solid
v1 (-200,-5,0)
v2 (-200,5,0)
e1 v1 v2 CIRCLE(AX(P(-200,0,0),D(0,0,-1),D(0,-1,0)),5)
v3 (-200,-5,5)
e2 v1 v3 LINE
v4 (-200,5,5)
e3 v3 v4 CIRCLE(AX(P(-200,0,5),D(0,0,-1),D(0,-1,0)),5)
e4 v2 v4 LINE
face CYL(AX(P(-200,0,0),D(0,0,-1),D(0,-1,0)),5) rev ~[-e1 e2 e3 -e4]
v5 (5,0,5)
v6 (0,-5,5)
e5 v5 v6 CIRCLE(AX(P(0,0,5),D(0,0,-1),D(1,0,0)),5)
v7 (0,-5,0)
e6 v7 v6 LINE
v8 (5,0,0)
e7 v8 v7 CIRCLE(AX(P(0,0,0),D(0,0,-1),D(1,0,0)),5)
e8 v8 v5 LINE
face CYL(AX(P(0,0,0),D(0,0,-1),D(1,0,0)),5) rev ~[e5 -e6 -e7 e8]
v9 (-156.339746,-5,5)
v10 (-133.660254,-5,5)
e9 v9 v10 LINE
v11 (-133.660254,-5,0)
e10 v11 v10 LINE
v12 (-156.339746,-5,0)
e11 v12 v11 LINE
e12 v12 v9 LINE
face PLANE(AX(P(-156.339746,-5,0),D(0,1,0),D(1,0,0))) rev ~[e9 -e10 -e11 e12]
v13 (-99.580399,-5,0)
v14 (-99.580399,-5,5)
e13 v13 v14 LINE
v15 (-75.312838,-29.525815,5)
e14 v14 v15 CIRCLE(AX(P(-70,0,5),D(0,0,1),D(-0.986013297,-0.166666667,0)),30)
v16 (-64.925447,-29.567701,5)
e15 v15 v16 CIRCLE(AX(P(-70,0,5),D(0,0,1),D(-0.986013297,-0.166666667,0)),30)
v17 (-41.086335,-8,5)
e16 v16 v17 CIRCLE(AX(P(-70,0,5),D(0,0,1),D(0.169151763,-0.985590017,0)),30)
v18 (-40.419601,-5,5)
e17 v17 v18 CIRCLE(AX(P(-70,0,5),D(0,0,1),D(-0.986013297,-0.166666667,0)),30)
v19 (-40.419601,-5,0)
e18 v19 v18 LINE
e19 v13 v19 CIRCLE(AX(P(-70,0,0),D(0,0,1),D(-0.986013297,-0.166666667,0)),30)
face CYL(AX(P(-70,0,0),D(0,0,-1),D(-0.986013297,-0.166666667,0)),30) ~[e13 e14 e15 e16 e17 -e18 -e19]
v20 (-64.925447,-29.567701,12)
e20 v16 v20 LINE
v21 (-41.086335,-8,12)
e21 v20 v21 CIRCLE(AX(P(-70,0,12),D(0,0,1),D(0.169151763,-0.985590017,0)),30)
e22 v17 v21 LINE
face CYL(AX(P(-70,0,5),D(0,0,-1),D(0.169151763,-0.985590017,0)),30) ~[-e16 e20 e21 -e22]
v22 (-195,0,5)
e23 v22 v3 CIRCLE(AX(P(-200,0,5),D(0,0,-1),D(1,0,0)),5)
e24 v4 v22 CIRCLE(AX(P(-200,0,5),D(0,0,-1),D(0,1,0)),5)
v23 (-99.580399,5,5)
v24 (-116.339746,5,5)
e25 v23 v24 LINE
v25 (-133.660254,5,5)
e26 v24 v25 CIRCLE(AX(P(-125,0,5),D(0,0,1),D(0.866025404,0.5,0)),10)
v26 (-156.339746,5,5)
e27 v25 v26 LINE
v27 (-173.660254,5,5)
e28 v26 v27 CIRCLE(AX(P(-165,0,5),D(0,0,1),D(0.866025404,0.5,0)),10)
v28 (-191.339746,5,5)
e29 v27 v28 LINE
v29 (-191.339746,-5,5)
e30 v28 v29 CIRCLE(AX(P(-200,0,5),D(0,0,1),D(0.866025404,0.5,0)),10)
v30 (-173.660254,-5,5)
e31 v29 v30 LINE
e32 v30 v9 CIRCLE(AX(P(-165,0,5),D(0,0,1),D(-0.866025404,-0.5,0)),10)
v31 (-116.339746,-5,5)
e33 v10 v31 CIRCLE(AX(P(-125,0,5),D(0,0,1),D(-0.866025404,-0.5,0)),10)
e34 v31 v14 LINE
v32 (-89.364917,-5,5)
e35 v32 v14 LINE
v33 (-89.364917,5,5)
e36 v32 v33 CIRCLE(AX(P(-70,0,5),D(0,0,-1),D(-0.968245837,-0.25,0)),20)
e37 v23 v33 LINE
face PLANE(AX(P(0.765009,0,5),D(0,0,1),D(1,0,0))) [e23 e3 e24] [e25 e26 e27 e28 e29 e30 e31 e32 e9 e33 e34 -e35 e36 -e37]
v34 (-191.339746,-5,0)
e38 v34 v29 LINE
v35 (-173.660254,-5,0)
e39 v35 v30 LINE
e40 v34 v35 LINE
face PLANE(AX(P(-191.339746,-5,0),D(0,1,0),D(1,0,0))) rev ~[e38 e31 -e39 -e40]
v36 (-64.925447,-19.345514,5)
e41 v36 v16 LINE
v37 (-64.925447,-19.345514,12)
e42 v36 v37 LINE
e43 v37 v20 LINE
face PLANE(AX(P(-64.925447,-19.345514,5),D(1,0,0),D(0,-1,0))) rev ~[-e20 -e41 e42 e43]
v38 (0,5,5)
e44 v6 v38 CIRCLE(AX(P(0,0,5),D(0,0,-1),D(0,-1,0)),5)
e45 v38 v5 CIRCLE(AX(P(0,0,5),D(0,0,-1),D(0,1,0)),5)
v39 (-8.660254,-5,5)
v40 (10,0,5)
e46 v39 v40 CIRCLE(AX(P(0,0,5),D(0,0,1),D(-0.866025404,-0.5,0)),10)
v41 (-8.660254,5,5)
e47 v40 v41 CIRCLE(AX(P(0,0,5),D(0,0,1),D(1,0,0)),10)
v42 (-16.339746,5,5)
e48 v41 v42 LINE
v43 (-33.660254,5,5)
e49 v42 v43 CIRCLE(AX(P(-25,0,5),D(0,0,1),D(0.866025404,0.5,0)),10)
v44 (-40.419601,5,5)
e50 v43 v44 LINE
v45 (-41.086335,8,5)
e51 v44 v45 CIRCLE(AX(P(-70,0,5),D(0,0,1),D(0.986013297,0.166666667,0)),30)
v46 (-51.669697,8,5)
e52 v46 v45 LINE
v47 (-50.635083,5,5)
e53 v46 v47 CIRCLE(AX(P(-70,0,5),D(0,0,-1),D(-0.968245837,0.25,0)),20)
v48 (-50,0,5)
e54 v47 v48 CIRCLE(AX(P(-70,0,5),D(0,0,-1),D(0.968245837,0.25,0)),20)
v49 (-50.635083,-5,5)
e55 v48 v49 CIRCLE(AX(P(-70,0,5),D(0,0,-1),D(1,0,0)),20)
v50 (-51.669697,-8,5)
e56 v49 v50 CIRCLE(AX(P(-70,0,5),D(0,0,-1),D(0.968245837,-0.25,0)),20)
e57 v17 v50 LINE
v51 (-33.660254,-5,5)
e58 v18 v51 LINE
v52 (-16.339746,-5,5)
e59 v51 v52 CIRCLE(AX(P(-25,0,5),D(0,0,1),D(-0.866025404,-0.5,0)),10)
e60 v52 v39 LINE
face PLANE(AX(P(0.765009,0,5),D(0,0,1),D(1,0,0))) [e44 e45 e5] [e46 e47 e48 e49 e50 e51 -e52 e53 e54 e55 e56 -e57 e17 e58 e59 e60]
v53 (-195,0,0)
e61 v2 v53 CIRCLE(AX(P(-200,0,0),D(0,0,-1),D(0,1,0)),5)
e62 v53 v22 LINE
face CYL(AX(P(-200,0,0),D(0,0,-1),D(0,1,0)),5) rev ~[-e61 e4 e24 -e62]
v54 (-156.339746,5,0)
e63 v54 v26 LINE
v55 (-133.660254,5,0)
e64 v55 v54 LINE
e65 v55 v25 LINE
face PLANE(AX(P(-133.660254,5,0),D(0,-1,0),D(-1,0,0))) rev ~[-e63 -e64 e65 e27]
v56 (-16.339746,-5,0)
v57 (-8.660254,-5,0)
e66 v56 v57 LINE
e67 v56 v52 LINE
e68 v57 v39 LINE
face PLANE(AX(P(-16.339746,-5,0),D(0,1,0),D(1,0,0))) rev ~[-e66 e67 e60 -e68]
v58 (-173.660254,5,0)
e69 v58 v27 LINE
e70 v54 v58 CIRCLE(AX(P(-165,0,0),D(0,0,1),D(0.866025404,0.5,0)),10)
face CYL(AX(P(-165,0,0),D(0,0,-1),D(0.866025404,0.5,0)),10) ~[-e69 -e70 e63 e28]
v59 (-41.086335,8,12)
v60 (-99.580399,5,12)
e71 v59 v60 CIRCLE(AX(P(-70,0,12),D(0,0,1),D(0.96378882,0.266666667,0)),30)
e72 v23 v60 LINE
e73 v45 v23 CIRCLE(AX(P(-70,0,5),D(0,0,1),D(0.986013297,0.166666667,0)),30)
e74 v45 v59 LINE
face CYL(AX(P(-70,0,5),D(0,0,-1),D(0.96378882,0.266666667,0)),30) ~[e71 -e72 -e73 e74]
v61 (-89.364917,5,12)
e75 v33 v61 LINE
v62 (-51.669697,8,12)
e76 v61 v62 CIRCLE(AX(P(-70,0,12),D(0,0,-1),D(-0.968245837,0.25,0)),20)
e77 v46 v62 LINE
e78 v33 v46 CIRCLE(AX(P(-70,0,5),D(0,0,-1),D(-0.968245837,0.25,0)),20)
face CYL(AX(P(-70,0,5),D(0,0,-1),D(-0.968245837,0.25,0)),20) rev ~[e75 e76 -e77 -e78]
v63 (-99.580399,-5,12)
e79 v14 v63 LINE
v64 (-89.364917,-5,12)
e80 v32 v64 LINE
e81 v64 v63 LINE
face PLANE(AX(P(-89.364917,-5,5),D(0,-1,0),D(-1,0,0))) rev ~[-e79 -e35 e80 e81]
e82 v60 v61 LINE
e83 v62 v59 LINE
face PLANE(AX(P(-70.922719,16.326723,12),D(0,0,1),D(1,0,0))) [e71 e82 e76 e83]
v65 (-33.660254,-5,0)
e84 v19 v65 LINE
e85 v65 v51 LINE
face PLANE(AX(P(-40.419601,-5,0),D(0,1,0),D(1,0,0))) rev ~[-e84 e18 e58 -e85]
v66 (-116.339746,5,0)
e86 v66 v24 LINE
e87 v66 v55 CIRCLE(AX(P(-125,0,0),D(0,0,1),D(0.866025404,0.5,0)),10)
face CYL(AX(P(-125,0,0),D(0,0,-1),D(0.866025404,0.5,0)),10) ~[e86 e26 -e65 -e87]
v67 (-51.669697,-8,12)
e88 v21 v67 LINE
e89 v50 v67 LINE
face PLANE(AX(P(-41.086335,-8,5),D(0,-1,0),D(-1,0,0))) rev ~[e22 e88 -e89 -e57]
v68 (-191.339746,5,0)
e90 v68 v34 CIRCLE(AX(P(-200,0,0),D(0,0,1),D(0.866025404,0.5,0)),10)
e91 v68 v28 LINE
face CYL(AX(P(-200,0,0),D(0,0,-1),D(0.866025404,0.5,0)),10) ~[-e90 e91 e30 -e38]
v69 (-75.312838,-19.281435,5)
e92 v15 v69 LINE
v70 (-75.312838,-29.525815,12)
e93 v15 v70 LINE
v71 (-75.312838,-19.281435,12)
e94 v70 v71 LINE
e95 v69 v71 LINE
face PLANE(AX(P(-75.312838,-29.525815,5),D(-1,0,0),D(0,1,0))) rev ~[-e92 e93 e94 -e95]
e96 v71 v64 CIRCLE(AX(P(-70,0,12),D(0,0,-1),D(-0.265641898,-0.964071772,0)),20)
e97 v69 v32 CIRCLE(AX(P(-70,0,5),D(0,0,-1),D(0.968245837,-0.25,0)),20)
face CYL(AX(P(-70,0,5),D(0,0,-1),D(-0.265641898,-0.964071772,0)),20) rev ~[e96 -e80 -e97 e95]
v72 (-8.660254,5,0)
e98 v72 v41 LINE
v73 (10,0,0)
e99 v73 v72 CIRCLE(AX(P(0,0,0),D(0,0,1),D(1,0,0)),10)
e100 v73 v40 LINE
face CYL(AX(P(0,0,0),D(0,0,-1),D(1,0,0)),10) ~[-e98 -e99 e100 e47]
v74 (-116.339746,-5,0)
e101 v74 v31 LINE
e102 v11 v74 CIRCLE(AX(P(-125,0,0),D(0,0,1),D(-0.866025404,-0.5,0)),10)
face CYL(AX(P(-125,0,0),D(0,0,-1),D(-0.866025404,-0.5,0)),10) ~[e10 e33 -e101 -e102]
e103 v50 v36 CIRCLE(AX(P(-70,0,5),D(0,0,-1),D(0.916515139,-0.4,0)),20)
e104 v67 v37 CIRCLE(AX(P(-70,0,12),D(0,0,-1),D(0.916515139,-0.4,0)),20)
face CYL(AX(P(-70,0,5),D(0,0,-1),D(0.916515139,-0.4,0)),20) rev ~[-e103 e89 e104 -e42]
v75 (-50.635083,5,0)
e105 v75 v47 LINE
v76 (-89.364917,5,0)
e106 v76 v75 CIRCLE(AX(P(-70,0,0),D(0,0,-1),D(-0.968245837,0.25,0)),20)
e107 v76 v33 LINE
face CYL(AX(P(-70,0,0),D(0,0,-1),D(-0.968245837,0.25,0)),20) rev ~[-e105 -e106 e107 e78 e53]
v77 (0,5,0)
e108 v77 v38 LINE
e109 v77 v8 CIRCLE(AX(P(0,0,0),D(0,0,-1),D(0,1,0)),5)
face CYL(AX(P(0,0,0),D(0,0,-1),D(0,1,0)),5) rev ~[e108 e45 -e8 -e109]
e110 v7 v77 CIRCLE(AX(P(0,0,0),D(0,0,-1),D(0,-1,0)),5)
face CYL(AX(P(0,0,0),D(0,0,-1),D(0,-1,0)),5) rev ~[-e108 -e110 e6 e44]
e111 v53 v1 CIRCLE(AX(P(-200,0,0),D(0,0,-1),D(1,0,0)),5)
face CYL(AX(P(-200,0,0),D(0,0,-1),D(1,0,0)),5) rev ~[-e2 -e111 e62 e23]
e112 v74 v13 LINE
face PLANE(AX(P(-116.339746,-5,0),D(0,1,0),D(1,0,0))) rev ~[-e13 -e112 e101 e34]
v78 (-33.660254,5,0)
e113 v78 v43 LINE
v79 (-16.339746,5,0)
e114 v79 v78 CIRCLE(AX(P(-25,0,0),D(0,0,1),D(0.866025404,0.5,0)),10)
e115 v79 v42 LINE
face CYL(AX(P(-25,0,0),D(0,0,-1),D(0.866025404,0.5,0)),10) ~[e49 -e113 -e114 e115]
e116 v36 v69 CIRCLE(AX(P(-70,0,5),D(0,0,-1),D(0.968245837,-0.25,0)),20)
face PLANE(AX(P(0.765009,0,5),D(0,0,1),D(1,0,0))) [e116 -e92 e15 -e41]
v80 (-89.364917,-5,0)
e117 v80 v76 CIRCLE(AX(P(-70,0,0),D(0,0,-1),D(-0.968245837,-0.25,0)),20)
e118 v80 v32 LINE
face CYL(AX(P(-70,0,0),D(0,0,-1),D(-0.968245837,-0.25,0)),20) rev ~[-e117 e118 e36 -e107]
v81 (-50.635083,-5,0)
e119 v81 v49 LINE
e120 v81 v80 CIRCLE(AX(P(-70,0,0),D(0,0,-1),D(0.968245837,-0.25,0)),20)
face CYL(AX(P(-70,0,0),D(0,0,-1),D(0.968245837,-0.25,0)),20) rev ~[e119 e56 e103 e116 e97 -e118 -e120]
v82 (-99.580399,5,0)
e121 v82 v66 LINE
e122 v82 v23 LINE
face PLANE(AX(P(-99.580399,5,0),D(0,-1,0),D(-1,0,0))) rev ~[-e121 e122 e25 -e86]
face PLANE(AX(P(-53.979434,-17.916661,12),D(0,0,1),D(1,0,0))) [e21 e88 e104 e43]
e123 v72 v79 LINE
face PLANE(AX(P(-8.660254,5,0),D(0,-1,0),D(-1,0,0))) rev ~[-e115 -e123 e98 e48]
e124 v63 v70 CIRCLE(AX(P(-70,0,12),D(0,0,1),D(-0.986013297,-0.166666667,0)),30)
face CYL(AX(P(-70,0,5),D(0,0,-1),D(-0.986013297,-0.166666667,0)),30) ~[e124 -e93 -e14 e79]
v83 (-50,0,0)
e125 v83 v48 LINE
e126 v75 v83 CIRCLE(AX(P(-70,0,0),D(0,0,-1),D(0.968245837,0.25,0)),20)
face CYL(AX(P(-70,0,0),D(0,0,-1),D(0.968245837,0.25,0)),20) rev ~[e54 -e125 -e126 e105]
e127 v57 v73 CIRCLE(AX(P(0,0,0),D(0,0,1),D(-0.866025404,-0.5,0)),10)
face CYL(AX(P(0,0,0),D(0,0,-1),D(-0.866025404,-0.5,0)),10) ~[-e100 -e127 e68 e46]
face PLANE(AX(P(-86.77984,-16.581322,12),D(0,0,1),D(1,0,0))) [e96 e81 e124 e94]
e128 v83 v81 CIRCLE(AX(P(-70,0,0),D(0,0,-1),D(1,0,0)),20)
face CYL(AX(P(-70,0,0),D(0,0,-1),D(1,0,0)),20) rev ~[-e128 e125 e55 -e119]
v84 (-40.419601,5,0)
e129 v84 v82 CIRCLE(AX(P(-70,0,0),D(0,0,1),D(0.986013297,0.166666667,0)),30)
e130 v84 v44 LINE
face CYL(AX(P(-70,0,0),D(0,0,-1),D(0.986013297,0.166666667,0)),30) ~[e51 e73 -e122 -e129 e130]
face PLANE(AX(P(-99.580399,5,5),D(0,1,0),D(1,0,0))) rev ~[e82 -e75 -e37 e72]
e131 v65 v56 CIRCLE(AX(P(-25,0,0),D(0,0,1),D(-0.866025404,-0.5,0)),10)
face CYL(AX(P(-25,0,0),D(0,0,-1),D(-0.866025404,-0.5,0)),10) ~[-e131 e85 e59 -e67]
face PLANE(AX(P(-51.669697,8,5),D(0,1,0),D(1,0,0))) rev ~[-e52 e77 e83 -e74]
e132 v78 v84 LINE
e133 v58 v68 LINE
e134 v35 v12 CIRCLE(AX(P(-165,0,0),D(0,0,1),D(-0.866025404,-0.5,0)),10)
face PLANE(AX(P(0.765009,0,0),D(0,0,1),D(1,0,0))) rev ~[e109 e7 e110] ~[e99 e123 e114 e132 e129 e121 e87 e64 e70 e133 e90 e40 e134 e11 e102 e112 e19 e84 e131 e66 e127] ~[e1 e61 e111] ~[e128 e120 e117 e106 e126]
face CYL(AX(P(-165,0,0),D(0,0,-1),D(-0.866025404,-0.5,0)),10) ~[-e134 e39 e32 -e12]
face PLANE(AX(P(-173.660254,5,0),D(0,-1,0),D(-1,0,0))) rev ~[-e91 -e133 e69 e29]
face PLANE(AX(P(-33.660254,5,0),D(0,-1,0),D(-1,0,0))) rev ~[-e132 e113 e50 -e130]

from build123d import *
from build123d import SkipClean  # not in build123d's __all__

# Parameters (mm, degrees)
F1_DEPTH = 5
F3_DEPTH = 7


with BuildPart() as f1:
    # F0 (on Top) → F1 (new body)
    with BuildSketch(Plane.XY):
        with BuildLine():
            ThreePointArc((0, 5), (3.5355339059, 3.5355339059), (5, 0))
            ThreePointArc((5, 0), (3.5355339059, -3.5355339059), (0, -5))
            Line((0, -5), (-8.6602540378, -5))
            ThreePointArc((-8.6602540378, -5), (2.588190451, -9.6592582629), (10, 0))
            ThreePointArc((10, 0), (2.588190451, 9.6592582629), (-8.6602540378, 5))
            Line((-8.6602540378, 5), (0, 5))
        make_face()
        with BuildLine():
            ThreePointArc((0, -5), (-5, 0), (0, 5))
            Line((0, 5), (-8.6602540378, 5))
            ThreePointArc((-8.6602540378, 5), (-10, 0), (-8.6602540378, -5))
            Line((-8.6602540378, -5), (0, -5))
        make_face()
        with BuildLine():
            ThreePointArc((-8.6602540378, -5), (-10, 0), (-8.6602540378, 5))
            Line((-8.6602540378, 5), (-16.3397459622, 5))
            ThreePointArc((-16.3397459622, 5), (-15.3407417371, 2.588190451), (-15, 0))
            ThreePointArc((-15, 0), (-15.3407417371, -2.588190451), (-16.3397459622, -5))
            Line((-16.3397459622, -5), (-8.6602540378, -5))
        make_face()
        with BuildLine():
            ThreePointArc((-15, 0), (-15.3407417371, 2.588190451), (-16.3397459622, 5))
            Line((-16.3397459622, 5), (-33.6602540378, 5))
            ThreePointArc((-33.6602540378, 5), (-35, 0), (-33.6602540378, -5))
            Line((-33.6602540378, -5), (-16.3397459622, -5))
            ThreePointArc((-16.3397459622, -5), (-15.3407417371, -2.588190451), (-15, 0))
        make_face()
        with BuildLine():
            Line((-33.6602540378, 5), (-16.3397459622, 5))
            ThreePointArc((-16.3397459622, 5), (-25, 10), (-33.6602540378, 5))
        make_face()
        with BuildLine():
            ThreePointArc((-33.6602540378, -5), (-25, -10), (-16.3397459622, -5))
            Line((-16.3397459622, -5), (-33.6602540378, -5))
        make_face()
        with BuildLine():
            ThreePointArc((-33.6602540378, -5), (-35, 0), (-33.6602540378, 5))
            Line((-33.6602540378, 5), (-40.4196010845, 5))
            ThreePointArc((-40.4196010845, 5), (-40.1050843164, 2.5087878084), (-40, 0))
            ThreePointArc((-40, 0), (-40.1050843164, -2.5087878084), (-40.4196010845, -5))
            Line((-40.4196010845, -5), (-33.6602540378, -5))
        make_face()
        with BuildLine():
            ThreePointArc((-40, 0), (-40.1050843164, 2.5087878084), (-40.4196010845, 5))
            Line((-40.4196010845, 5), (-50.635083269, 5))
            ThreePointArc((-50.635083269, 5), (-50.1594060747, 2.5200858497), (-50, 0))
            ThreePointArc((-50, 0), (-50.1594060747, -2.5200858497), (-50.635083269, -5))
            Line((-50.635083269, -5), (-40.4196010845, -5))
            ThreePointArc((-40.4196010845, -5), (-40.1050843164, -2.5087878084), (-40, 0))
        make_face()
        with BuildLine():
            Line((-50.635083269, 5), (-40.4196010845, 5))
            ThreePointArc((-40.4196010845, 5), (-70, 30), (-99.5803989155, 5))
            Line((-99.5803989155, 5), (-89.364916731, 5))
            ThreePointArc((-89.364916731, 5), (-70, 20), (-50.635083269, 5))
        make_face()
        with BuildLine():
            ThreePointArc((-99.5803989155, -5), (-70, -30), (-40.4196010845, -5))
            Line((-40.4196010845, -5), (-50.635083269, -5))
            ThreePointArc((-50.635083269, -5), (-70, -20), (-89.364916731, -5))
            Line((-89.364916731, -5), (-99.5803989155, -5))
        make_face()
        with BuildLine():
            ThreePointArc((-99.5803989155, -5), (-100, 0), (-99.5803989155, 5))
            Line((-99.5803989155, 5), (-116.3397459622, 5))
            ThreePointArc((-116.3397459622, 5), (-115.3407417371, 2.588190451), (-115, 0))
            ThreePointArc((-115, 0), (-115.3407417371, -2.588190451), (-116.3397459622, -5))
            Line((-116.3397459622, -5), (-99.5803989155, -5))
        make_face()
        with BuildLine():
            Line((-89.364916731, 5), (-99.5803989155, 5))
            ThreePointArc((-99.5803989155, 5), (-100, 0), (-99.5803989155, -5))
            Line((-99.5803989155, -5), (-89.364916731, -5))
            ThreePointArc((-89.364916731, -5), (-90, 0), (-89.364916731, 5))
        make_face()
        with BuildLine():
            ThreePointArc((-115, 0), (-115.3407417371, 2.588190451), (-116.3397459622, 5))
            Line((-116.3397459622, 5), (-133.6602540378, 5))
            ThreePointArc((-133.6602540378, 5), (-135, 0), (-133.6602540378, -5))
            Line((-133.6602540378, -5), (-116.3397459622, -5))
            ThreePointArc((-116.3397459622, -5), (-115.3407417371, -2.588190451), (-115, 0))
        make_face()
        with BuildLine():
            Line((-133.6602540378, 5), (-116.3397459622, 5))
            ThreePointArc((-116.3397459622, 5), (-125, 10), (-133.6602540378, 5))
        make_face()
        with BuildLine():
            ThreePointArc((-133.6602540378, -5), (-125, -10), (-116.3397459622, -5))
            Line((-116.3397459622, -5), (-133.6602540378, -5))
        make_face()
        with BuildLine():
            ThreePointArc((-133.6602540378, -5), (-135, 0), (-133.6602540378, 5))
            Line((-133.6602540378, 5), (-156.3397459622, 5))
            ThreePointArc((-156.3397459622, 5), (-155.3407417371, 2.588190451), (-155, 0))
            ThreePointArc((-155, 0), (-155.3407417371, -2.588190451), (-156.3397459622, -5))
            Line((-156.3397459622, -5), (-133.6602540378, -5))
        make_face()
        with BuildLine():
            ThreePointArc((-155, 0), (-155.3407417371, 2.588190451), (-156.3397459622, 5))
            Line((-156.3397459622, 5), (-173.6602540378, 5))
            ThreePointArc((-173.6602540378, 5), (-175, 0), (-173.6602540378, -5))
            Line((-173.6602540378, -5), (-156.3397459622, -5))
            ThreePointArc((-156.3397459622, -5), (-155.3407417371, -2.588190451), (-155, 0))
        make_face()
        with BuildLine():
            Line((-173.6602540378, 5), (-156.3397459622, 5))
            ThreePointArc((-156.3397459622, 5), (-165, 10), (-173.6602540378, 5))
        make_face()
        with BuildLine():
            ThreePointArc((-173.6602540378, -5), (-165, -10), (-156.3397459622, -5))
            Line((-156.3397459622, -5), (-173.6602540378, -5))
        make_face()
        with BuildLine():
            ThreePointArc((-173.6602540378, -5), (-175, 0), (-173.6602540378, 5))
            Line((-173.6602540378, 5), (-191.3397459622, 5))
            ThreePointArc((-191.3397459622, 5), (-190.3407417371, 2.588190451), (-190, 0))
            ThreePointArc((-190, 0), (-190.3407417371, -2.588190451), (-191.3397459622, -5))
            Line((-191.3397459622, -5), (-173.6602540378, -5))
        make_face()
        with BuildLine():
            ThreePointArc((-190, 0), (-190.3407417371, 2.588190451), (-191.3397459622, 5))
            Line((-191.3397459622, 5), (-200, 5))
            ThreePointArc((-200, 5), (-196.4644660941, 3.5355339059), (-195, 0))
            ThreePointArc((-195, 0), (-196.4644660941, -3.5355339059), (-200, -5))
            Line((-200, -5), (-191.3397459622, -5))
            ThreePointArc((-191.3397459622, -5), (-190.3407417371, -2.588190451), (-190, 0))
        make_face()
        with BuildLine():
            Line((-200, 5), (-191.3397459622, 5))
            ThreePointArc((-191.3397459622, 5), (-210, 0), (-191.3397459622, -5))
            Line((-191.3397459622, -5), (-200, -5))
            ThreePointArc((-200, -5), (-205, 0), (-200, 5))
        make_face()
    extrude(amount=F1_DEPTH)

    # F2 (on face) → F3 (join)
    with BuildSketch(Plane.XY.offset(5)):
        with BuildLine():
            ThreePointArc((-75.3128379583, -19.2814354452), (-84.2561475764, -14.0271970215), (-89.364916731, -5))
            Line((-89.364916731, -5), (-99.5803989155, -5))
            ThreePointArc((-99.5803989155, -5), (-91.3251821922, -21.1006304282), (-75.3128379583, -29.5258150239))
            Line((-75.3128379583, -29.5258150239), (-75.3128379583, -19.2814354452))
        make_face()
        with BuildLine():
            ThreePointArc((-41.0863354104, 8), (-71.5365980819, 29.9606219284), (-99.5803989155, 5))
            Line((-99.5803989155, 5), (-89.364916731, 5))
            ThreePointArc((-89.364916731, 5), (-71.5866967281, 19.9369604878), (-51.6696972202, 8))
            Line((-51.6696972202, 8), (-41.0863354104, 8))
        make_face()
        with BuildLine():
            ThreePointArc((-64.9254471064, -29.5677005012), (-49.8731234875, -22.2465467399), (-41.0863354104, -8))
            Line((-41.0863354104, -8), (-51.6696972202, -8))
            ThreePointArc((-51.6696972202, -8), (-56.9951167094, -15.1945059346), (-64.9254471064, -19.345514026))
            Line((-64.9254471064, -19.345514026), (-64.9254471064, -29.5677005012))
        make_face()
    with SkipClean():  # cleaning this boolean's faces spoils the solid; the shape is the same uncleaned
        extrude(amount=F3_DEPTH)


solid = f1.part
